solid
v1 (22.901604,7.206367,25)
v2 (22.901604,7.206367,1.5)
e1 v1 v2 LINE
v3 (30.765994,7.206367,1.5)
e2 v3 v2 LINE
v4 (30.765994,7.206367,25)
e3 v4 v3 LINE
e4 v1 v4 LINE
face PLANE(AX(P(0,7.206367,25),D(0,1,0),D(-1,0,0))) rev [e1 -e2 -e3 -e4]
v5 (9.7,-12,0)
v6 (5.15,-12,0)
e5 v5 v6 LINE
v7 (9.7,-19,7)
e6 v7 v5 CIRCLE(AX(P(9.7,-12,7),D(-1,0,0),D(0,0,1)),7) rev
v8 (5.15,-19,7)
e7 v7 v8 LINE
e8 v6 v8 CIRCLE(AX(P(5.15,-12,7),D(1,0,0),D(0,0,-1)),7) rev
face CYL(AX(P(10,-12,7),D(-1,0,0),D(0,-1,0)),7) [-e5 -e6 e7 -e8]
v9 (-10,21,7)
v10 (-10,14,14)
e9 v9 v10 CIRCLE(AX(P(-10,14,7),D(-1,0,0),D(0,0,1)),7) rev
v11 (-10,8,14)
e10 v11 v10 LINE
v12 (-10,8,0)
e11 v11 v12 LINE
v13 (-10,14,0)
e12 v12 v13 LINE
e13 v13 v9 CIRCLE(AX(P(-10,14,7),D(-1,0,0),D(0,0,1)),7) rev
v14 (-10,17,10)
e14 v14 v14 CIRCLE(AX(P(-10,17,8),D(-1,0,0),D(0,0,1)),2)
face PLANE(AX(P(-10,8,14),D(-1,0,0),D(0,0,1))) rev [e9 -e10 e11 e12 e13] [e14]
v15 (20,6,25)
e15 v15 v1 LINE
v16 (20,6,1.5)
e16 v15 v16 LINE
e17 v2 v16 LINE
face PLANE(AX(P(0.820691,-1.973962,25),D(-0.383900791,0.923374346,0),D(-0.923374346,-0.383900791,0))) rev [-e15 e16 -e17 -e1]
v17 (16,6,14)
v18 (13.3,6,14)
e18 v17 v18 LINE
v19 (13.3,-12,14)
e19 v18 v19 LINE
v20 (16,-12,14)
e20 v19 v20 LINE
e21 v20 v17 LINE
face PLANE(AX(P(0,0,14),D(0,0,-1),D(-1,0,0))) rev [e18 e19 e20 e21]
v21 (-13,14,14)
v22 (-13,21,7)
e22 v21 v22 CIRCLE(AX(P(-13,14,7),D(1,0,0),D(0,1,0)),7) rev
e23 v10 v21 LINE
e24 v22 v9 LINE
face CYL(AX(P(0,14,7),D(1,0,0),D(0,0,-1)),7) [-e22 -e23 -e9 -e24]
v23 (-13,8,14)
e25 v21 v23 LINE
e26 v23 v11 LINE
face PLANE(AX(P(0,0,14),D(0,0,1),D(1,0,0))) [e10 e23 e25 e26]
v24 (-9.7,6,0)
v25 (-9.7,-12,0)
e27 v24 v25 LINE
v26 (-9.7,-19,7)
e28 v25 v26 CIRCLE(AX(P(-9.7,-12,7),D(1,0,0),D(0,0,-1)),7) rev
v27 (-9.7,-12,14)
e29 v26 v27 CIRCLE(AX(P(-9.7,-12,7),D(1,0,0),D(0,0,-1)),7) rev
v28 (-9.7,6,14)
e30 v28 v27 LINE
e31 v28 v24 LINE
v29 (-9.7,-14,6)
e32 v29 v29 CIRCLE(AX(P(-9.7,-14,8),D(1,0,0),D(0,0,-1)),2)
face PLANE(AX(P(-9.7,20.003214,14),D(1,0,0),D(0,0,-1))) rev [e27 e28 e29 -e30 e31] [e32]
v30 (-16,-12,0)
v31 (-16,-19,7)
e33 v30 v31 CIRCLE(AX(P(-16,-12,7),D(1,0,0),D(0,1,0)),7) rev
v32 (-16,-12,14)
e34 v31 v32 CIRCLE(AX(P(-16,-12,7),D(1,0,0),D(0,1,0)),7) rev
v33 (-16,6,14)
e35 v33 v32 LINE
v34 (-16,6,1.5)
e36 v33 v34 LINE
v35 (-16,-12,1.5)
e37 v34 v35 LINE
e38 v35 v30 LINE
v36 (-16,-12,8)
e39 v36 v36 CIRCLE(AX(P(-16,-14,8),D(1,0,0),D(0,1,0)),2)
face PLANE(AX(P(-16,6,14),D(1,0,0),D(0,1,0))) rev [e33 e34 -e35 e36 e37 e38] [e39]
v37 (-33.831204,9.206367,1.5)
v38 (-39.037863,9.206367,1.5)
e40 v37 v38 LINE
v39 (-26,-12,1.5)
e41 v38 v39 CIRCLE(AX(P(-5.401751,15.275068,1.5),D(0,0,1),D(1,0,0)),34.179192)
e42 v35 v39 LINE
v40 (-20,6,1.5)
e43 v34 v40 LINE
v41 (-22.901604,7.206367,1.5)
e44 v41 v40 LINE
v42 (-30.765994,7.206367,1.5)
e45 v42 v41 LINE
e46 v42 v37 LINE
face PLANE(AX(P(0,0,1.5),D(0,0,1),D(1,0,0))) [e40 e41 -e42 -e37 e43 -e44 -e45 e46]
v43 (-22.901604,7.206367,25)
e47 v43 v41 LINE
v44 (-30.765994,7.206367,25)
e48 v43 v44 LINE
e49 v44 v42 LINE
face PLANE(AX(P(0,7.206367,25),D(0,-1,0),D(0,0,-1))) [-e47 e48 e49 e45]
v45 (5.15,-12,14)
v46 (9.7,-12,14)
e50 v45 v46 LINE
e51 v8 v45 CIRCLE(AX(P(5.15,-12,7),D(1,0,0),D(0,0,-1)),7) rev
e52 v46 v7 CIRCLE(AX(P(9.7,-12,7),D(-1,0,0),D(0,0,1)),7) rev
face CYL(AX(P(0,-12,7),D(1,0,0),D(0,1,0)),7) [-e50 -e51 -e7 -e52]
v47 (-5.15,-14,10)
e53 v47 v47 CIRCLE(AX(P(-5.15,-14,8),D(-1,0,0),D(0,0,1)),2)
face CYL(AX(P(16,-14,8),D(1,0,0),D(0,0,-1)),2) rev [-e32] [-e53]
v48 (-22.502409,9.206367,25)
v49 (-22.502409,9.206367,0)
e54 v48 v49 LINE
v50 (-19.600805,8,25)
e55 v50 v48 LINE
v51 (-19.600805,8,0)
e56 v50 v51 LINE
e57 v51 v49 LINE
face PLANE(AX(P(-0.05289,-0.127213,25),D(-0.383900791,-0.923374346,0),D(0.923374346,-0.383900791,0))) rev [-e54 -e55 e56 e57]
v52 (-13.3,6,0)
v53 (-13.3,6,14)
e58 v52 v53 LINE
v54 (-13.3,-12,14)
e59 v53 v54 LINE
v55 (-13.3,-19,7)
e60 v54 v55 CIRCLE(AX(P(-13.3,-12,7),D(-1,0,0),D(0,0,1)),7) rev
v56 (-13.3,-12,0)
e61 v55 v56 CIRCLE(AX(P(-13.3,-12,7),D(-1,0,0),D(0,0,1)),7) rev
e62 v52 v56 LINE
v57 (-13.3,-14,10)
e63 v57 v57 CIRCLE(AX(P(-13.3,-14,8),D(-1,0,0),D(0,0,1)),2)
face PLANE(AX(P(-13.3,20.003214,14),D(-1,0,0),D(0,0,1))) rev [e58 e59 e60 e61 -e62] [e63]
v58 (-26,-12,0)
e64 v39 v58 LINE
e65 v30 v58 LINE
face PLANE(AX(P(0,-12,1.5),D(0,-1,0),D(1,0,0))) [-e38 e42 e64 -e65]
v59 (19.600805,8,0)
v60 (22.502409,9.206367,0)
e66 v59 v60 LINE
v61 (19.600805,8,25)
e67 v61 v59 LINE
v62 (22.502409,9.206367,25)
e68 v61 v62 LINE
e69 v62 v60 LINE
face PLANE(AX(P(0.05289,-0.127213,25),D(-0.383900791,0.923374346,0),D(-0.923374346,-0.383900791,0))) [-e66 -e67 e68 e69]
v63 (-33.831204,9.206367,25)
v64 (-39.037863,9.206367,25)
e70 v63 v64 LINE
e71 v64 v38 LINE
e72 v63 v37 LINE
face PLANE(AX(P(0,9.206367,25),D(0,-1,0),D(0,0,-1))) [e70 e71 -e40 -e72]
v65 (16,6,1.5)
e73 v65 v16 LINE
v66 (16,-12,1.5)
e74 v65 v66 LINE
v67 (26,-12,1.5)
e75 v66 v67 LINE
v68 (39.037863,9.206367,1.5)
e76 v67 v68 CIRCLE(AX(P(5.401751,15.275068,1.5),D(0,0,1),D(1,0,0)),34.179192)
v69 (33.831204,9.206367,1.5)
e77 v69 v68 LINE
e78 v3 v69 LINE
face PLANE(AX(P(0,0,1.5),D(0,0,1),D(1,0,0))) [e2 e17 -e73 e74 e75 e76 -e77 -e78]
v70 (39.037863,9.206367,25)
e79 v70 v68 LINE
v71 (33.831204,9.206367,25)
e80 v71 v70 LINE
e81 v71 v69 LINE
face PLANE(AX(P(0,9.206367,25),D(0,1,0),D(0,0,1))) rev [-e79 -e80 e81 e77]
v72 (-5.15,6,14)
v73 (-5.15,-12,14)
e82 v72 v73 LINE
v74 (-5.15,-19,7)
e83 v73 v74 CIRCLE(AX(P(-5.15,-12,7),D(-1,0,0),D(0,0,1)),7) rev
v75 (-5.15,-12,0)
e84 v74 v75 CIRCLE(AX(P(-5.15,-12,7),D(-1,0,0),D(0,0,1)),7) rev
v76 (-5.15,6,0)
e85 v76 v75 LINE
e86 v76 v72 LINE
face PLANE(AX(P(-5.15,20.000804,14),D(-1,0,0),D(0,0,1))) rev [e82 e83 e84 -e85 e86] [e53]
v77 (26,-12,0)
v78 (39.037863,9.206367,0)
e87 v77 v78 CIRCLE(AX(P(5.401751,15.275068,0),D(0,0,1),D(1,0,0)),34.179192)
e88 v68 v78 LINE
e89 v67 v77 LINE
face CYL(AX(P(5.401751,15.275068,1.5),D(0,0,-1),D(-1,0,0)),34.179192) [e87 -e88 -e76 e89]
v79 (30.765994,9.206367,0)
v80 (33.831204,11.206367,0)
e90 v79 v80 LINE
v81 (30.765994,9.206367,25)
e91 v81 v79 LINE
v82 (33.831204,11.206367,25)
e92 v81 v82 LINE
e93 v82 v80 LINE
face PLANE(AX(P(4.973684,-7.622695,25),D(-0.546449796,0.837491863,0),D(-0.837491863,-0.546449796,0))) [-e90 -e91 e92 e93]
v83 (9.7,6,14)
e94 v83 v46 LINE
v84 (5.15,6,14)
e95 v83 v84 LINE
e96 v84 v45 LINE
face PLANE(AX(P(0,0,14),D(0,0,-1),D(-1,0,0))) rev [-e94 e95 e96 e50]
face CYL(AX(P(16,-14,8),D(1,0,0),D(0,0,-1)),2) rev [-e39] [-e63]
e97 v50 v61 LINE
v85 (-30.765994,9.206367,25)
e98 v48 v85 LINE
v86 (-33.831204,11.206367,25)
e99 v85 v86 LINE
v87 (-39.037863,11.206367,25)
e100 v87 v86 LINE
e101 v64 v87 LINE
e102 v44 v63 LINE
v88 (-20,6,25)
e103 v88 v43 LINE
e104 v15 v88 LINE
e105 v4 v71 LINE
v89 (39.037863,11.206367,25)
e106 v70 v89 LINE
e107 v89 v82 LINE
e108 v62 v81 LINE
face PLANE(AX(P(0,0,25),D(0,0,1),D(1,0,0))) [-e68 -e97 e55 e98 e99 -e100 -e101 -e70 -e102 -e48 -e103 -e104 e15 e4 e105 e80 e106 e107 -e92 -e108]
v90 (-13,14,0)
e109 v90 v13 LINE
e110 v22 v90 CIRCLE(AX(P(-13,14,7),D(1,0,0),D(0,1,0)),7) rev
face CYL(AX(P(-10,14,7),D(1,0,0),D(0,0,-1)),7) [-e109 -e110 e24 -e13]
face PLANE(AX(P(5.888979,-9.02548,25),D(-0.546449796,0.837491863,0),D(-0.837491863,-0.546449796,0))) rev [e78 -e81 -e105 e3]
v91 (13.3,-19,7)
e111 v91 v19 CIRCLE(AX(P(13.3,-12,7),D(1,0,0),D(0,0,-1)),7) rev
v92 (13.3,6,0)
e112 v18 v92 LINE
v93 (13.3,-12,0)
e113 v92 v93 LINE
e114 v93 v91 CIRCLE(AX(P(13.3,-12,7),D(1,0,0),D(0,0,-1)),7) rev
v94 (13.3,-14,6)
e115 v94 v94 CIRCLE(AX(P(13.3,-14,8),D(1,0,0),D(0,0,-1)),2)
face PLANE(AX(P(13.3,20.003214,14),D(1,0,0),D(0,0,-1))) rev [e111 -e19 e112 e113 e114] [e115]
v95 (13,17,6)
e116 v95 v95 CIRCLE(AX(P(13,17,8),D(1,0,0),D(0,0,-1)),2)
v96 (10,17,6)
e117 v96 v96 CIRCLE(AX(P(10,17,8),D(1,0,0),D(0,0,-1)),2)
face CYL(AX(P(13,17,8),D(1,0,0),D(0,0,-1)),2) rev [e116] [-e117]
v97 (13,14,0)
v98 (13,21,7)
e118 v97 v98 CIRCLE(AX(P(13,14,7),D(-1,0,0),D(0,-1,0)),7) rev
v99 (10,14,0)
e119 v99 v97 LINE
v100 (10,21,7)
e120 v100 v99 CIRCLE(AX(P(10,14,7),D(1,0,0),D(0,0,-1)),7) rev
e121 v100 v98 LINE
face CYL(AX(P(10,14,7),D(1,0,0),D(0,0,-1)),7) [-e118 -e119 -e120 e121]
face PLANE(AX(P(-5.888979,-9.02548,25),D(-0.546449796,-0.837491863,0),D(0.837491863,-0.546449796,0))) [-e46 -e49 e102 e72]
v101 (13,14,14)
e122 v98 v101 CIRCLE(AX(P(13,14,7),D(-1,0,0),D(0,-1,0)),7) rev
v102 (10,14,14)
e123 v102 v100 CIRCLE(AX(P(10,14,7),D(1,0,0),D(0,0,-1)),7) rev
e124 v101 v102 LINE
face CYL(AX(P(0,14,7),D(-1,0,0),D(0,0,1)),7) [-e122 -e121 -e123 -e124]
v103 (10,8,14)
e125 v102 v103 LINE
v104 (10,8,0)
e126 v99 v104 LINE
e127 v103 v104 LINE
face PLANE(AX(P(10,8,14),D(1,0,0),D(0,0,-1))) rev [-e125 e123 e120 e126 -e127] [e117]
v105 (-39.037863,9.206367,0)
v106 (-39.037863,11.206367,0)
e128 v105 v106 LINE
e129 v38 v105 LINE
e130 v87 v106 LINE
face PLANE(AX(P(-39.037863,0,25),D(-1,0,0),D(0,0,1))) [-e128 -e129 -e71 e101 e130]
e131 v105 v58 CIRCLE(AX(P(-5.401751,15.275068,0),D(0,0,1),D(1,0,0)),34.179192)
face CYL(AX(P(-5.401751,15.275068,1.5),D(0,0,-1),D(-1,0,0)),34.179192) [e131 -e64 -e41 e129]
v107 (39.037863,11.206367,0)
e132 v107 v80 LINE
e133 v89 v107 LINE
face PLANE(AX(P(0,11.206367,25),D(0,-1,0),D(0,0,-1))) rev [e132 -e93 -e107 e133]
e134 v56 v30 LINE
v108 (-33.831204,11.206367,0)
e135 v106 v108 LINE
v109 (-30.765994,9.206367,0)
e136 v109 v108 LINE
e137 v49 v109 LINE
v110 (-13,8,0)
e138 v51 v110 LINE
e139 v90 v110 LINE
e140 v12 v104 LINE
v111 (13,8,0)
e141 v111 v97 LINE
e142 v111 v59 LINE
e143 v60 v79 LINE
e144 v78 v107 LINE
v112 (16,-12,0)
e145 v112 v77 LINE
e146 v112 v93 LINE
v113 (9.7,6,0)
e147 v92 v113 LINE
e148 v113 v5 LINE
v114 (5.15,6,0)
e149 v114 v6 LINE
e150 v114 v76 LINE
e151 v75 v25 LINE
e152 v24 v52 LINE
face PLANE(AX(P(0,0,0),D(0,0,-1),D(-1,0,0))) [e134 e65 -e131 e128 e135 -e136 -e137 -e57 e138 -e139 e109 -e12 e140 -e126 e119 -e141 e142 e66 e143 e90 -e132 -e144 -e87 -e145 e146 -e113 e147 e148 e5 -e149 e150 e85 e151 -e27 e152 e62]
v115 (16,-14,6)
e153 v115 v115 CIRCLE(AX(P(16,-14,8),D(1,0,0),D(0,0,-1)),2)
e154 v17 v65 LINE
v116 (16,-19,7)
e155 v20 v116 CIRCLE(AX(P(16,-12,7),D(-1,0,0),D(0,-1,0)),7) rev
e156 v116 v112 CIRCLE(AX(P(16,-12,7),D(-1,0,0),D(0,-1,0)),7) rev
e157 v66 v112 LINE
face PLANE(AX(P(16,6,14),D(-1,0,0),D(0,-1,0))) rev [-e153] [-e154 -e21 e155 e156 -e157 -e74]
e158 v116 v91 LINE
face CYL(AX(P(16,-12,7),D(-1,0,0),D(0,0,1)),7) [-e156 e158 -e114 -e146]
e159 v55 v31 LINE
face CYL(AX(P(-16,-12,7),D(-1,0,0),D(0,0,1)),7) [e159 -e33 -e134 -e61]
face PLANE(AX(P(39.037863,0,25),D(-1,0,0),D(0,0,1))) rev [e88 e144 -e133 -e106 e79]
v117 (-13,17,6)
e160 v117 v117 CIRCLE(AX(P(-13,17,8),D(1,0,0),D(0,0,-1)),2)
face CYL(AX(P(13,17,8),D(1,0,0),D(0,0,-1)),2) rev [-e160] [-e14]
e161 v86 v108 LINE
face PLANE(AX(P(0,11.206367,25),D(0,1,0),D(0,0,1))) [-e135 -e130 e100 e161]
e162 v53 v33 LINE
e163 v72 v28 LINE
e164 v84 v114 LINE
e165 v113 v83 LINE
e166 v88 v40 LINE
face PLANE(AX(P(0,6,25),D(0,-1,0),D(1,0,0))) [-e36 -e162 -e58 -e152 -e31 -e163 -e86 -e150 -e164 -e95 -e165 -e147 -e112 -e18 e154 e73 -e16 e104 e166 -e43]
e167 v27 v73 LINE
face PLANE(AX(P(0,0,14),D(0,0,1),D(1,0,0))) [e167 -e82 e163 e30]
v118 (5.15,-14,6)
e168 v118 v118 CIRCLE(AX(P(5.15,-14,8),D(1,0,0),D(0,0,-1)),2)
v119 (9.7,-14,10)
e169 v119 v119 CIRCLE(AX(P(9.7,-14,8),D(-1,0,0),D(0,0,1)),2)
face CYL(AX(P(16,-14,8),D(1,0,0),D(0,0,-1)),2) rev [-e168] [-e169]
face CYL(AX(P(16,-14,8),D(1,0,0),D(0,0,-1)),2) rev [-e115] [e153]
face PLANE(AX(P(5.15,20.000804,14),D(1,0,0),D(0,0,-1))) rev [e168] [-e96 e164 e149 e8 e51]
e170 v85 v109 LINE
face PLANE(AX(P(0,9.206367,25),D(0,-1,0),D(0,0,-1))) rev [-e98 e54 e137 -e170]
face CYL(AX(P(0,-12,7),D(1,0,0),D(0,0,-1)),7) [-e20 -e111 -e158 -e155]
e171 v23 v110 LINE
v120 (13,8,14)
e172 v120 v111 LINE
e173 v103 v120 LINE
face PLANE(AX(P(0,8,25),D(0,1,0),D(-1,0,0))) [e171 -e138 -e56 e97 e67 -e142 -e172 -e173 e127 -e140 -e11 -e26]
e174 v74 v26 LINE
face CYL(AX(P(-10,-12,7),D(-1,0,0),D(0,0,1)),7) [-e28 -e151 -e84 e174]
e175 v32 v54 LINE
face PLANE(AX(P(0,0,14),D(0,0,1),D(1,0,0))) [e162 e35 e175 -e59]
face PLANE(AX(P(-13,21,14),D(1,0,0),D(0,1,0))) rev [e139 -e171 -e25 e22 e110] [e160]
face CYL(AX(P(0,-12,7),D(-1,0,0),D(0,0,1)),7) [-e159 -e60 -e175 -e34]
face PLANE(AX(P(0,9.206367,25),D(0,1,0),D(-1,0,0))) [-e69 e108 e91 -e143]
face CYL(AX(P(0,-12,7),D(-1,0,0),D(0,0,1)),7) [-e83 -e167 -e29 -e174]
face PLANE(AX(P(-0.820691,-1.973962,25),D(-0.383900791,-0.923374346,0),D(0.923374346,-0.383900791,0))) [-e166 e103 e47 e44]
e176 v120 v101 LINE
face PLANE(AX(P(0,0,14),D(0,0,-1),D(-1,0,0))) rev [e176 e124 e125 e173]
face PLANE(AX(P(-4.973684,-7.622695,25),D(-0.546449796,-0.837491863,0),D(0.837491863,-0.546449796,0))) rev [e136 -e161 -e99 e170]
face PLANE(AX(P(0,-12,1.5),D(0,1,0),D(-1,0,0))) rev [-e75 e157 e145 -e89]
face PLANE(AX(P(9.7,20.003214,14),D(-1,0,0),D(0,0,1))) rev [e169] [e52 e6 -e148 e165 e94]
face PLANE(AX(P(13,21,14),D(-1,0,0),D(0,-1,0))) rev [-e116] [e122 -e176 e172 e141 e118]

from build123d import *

# Parameters (mm, degrees)
SKETCH2_W                 = 5
SKETCH2_H                 = 25
BOSS_EXTRUDE1_DEPTH       = 14
BOSS_EXTRUDE1_2_DEPTH     = 14
BOSS_EXTRUDE3_DEPTH       = 25
SKETCH5_W                 = 3
SKETCH5_H                 = 13
BOSS_EXTRUDE4_DEPTH       = 14
SKETCH7_W                 = 3
SKETCH7_H                 = 25
BOSS_EXTRUDE5_DEPTH       = 14
SKETCH15_W                = 0.3
SKETCH15_H                = 14
CUT_EXTRUDE2_DEPTH        = 25
SKETCH16_W                = 0.15
SKETCH16_H                = 14
CUT_EXTRUDE3_DEPTH        = 25
FILLET1_R                 = 7
F_4_0MM_DOWEL_HOLE2_D     = 4
FILLET2_R                 = 7
F_4_0MM_DOWEL_HOLE1_D     = 4
F_4_0MM_DOWEL_HOLE1_DEPTH = 26
F_4_0MM_DOWEL_HOLE1_TIP   = 1.201721238
BOSS_EXTRUDE6_DEPTH       = 1.5


with BuildPart() as part:
    # Sketch2 → Boss-Extrude1 (new body)
    with BuildSketch(Plane.XY):
        with Locations((-7.5, -6.5)):
            Rectangle(SKETCH2_W, SKETCH2_H)
    extrude(amount=BOSS_EXTRUDE1_DEPTH)



with BuildPart() as body_2:
    # Sketch2 → Boss-Extrude1 2 (new body)
    with BuildSketch(Plane.XY):
        with Locations((7.5, -6.5)):
            Rectangle(SKETCH2_W, SKETCH2_H)
    extrude(amount=BOSS_EXTRUDE1_2_DEPTH)


with BuildPart() as part_1:
    add(part.part)

    add(body_2.part)  # Boss-Extrude3 merges body 2
    # Sketch4 → Boss-Extrude3 (add)
    with BuildSketch(Plane.XY):
        Polygon((-26, 9.206366686), (-30.765993712, 9.206366686), (-33.831204342, 11.206366686), (-39.037863495, 11.206366686), (-39.037863495, 9.206366686), (-33.831204342, 9.206366686), (-30.765993712, 7.206366686), (-26, 7.206366686), align=None)
        Polygon((22.901603942, 7.206366686), (26, 7.206366686), (26, 9.206366686), (22.502408858, 9.206366686), (19.600804916, 8), (10, 8), (-10, 8), (-19.600804916, 8), (-22.502408858, 9.206366686), (-26, 9.206366686), (-26, 7.206366686), (-22.901603942, 7.206366686), (-20, 6), (-10, 6), (10, 6), (20, 6), align=None)
        Polygon((26, 7.206366686), (26, 9.206366686), (30.765993712, 9.206366686), (33.831204342, 11.206366686), (39.037863495, 11.206366686), (39.037863495, 9.206366686), (33.831204342, 9.206366686), (30.765993712, 7.206366686), align=None)
    extrude(amount=BOSS_EXTRUDE3_DEPTH)

    # Sketch5 → Boss-Extrude4 (add)
    with BuildSketch(Plane.XY):
        with Locations((-11.5, 14.5)):
            Rectangle(SKETCH5_W, SKETCH5_H)
        with Locations((11.5, 14.5)):
            Rectangle(SKETCH5_W, SKETCH5_H)
    extrude(amount=BOSS_EXTRUDE4_DEPTH)

    # Sketch7 → Boss-Extrude5 (add)
    with BuildSketch(Plane.XY):
        with Locations((-14.5, -6.5)):
            Rectangle(SKETCH7_W, SKETCH7_H)
        with Locations((14.5, -6.5)):
            Rectangle(SKETCH7_W, SKETCH7_H)
    extrude(amount=BOSS_EXTRUDE5_DEPTH)

    # Sketch15 → Cut-Extrude2 (cut)
    with BuildSketch(Plane.XZ.offset(19)):
        with Locations((-9.85, 7)):
            Rectangle(SKETCH15_W, SKETCH15_H)
        with Locations((9.85, 7)):
            Rectangle(SKETCH15_W, SKETCH15_H)
        with Locations((-13.15, 7)):
            Rectangle(SKETCH15_W, SKETCH15_H)
        with Locations((13.15, 7)):
            Rectangle(SKETCH15_W, SKETCH15_H)
    extrude(amount=-CUT_EXTRUDE2_DEPTH, mode=Mode.SUBTRACT)

    # Sketch16 → Cut-Extrude3 (cut)
    with BuildSketch(Plane.XZ.offset(19)):
        with Locations((-5.075, 7)):
            Rectangle(SKETCH16_W, SKETCH16_H)
        with Locations((5.075, 7)):
            Rectangle(SKETCH16_W, SKETCH16_H)
    extrude(amount=-CUT_EXTRUDE3_DEPTH, mode=Mode.SUBTRACT)

    # Fillet1
    fillet1_edges = [part_1.edges().sort_by_distance(p)[0] for p in [
        (7.425, -19, 0),
        (7.425, -19, 14),
        (-7.425, -19, 0),
        (-7.425, -19, 14),
        (-14.65, -19, 0),
        (-14.65, -19, 14),
        (14.65, -19, 14),
        (14.65, -19, 0),
    ]]
    fillet(fillet1_edges, radius=FILLET1_R - 0.0001)  # a hair under: the kernel refuses the full size

    # Ø4.0mm Dowel Hole2 (through all)
    with Locations(Plane(origin=(16, 0, 0), x_dir=(0, 0, -1), z_dir=(1, 0, 0))):
        with Locations((-8, -14)):
            Hole(F_4_0MM_DOWEL_HOLE2_D / 2)

    # Fillet2
    fillet2_edges = [part_1.edges().sort_by_distance(p)[0] for p in [
        (-11.5, 21, 0),
        (-11.5, 21, 14),
        (11.5, 21, 0),
        (11.5, 21, 14),
    ]]
    fillet(fillet2_edges, radius=FILLET2_R - 0.0001)  # a hair under: the kernel refuses the full size

    # Ø4.0mm Dowel Hole1
    with Locations(Plane(origin=(13, 0, 0), x_dir=(0, 0, -1), z_dir=(1, 0, 0))):
        with Locations((-8, 17)):
            Hole(F_4_0MM_DOWEL_HOLE1_D / 2, depth=F_4_0MM_DOWEL_HOLE1_DEPTH)
            with Locations((0, 0, -(F_4_0MM_DOWEL_HOLE1_DEPTH + F_4_0MM_DOWEL_HOLE1_TIP / 2))):  # 118° drill point
                Cone(0, F_4_0MM_DOWEL_HOLE1_D / 2, F_4_0MM_DOWEL_HOLE1_TIP, mode=Mode.SUBTRACT)

    # Sketch14 → Boss-Extrude6 (add)
    with BuildSketch(Plane.XY):
        with BuildLine():
            Line((-22.901603942, 7.206366686), (-30.765993712, 7.206366686))
            Line((-30.765993712, 7.206366686), (-33.831204342, 9.206366686))
            Line((-33.831204342, 9.206366686), (-39.037863495, 9.206366686))
            ThreePointArc((-39.037863495, 9.206366686), (-34.518223809, -2.625999259), (-26, -12))
            Line((-26, -12), (-16, -12))
            Line((-16, -12), (-16, 6))
            Line((-16, 6), (-20, 6))
            Line((-20, 6), (-22.901603942, 7.206366686))
        make_face()
        with BuildLine():
            Line((20, 6), (16, 6))
            Line((16, 6), (16, -12))
            Line((16, -12), (26, -12))
            ThreePointArc((26, -12), (34.518223809, -2.625999259), (39.037863495, 9.206366686))
            Line((39.037863495, 9.206366686), (33.831204342, 9.206366686))
            Line((33.831204342, 9.206366686), (30.765993712, 7.206366686))
            Line((30.765993712, 7.206366686), (22.901603942, 7.206366686))
            Line((22.901603942, 7.206366686), (20, 6))
        make_face()
    extrude(amount=BOSS_EXTRUDE6_DEPTH)


solid = part_1.part
